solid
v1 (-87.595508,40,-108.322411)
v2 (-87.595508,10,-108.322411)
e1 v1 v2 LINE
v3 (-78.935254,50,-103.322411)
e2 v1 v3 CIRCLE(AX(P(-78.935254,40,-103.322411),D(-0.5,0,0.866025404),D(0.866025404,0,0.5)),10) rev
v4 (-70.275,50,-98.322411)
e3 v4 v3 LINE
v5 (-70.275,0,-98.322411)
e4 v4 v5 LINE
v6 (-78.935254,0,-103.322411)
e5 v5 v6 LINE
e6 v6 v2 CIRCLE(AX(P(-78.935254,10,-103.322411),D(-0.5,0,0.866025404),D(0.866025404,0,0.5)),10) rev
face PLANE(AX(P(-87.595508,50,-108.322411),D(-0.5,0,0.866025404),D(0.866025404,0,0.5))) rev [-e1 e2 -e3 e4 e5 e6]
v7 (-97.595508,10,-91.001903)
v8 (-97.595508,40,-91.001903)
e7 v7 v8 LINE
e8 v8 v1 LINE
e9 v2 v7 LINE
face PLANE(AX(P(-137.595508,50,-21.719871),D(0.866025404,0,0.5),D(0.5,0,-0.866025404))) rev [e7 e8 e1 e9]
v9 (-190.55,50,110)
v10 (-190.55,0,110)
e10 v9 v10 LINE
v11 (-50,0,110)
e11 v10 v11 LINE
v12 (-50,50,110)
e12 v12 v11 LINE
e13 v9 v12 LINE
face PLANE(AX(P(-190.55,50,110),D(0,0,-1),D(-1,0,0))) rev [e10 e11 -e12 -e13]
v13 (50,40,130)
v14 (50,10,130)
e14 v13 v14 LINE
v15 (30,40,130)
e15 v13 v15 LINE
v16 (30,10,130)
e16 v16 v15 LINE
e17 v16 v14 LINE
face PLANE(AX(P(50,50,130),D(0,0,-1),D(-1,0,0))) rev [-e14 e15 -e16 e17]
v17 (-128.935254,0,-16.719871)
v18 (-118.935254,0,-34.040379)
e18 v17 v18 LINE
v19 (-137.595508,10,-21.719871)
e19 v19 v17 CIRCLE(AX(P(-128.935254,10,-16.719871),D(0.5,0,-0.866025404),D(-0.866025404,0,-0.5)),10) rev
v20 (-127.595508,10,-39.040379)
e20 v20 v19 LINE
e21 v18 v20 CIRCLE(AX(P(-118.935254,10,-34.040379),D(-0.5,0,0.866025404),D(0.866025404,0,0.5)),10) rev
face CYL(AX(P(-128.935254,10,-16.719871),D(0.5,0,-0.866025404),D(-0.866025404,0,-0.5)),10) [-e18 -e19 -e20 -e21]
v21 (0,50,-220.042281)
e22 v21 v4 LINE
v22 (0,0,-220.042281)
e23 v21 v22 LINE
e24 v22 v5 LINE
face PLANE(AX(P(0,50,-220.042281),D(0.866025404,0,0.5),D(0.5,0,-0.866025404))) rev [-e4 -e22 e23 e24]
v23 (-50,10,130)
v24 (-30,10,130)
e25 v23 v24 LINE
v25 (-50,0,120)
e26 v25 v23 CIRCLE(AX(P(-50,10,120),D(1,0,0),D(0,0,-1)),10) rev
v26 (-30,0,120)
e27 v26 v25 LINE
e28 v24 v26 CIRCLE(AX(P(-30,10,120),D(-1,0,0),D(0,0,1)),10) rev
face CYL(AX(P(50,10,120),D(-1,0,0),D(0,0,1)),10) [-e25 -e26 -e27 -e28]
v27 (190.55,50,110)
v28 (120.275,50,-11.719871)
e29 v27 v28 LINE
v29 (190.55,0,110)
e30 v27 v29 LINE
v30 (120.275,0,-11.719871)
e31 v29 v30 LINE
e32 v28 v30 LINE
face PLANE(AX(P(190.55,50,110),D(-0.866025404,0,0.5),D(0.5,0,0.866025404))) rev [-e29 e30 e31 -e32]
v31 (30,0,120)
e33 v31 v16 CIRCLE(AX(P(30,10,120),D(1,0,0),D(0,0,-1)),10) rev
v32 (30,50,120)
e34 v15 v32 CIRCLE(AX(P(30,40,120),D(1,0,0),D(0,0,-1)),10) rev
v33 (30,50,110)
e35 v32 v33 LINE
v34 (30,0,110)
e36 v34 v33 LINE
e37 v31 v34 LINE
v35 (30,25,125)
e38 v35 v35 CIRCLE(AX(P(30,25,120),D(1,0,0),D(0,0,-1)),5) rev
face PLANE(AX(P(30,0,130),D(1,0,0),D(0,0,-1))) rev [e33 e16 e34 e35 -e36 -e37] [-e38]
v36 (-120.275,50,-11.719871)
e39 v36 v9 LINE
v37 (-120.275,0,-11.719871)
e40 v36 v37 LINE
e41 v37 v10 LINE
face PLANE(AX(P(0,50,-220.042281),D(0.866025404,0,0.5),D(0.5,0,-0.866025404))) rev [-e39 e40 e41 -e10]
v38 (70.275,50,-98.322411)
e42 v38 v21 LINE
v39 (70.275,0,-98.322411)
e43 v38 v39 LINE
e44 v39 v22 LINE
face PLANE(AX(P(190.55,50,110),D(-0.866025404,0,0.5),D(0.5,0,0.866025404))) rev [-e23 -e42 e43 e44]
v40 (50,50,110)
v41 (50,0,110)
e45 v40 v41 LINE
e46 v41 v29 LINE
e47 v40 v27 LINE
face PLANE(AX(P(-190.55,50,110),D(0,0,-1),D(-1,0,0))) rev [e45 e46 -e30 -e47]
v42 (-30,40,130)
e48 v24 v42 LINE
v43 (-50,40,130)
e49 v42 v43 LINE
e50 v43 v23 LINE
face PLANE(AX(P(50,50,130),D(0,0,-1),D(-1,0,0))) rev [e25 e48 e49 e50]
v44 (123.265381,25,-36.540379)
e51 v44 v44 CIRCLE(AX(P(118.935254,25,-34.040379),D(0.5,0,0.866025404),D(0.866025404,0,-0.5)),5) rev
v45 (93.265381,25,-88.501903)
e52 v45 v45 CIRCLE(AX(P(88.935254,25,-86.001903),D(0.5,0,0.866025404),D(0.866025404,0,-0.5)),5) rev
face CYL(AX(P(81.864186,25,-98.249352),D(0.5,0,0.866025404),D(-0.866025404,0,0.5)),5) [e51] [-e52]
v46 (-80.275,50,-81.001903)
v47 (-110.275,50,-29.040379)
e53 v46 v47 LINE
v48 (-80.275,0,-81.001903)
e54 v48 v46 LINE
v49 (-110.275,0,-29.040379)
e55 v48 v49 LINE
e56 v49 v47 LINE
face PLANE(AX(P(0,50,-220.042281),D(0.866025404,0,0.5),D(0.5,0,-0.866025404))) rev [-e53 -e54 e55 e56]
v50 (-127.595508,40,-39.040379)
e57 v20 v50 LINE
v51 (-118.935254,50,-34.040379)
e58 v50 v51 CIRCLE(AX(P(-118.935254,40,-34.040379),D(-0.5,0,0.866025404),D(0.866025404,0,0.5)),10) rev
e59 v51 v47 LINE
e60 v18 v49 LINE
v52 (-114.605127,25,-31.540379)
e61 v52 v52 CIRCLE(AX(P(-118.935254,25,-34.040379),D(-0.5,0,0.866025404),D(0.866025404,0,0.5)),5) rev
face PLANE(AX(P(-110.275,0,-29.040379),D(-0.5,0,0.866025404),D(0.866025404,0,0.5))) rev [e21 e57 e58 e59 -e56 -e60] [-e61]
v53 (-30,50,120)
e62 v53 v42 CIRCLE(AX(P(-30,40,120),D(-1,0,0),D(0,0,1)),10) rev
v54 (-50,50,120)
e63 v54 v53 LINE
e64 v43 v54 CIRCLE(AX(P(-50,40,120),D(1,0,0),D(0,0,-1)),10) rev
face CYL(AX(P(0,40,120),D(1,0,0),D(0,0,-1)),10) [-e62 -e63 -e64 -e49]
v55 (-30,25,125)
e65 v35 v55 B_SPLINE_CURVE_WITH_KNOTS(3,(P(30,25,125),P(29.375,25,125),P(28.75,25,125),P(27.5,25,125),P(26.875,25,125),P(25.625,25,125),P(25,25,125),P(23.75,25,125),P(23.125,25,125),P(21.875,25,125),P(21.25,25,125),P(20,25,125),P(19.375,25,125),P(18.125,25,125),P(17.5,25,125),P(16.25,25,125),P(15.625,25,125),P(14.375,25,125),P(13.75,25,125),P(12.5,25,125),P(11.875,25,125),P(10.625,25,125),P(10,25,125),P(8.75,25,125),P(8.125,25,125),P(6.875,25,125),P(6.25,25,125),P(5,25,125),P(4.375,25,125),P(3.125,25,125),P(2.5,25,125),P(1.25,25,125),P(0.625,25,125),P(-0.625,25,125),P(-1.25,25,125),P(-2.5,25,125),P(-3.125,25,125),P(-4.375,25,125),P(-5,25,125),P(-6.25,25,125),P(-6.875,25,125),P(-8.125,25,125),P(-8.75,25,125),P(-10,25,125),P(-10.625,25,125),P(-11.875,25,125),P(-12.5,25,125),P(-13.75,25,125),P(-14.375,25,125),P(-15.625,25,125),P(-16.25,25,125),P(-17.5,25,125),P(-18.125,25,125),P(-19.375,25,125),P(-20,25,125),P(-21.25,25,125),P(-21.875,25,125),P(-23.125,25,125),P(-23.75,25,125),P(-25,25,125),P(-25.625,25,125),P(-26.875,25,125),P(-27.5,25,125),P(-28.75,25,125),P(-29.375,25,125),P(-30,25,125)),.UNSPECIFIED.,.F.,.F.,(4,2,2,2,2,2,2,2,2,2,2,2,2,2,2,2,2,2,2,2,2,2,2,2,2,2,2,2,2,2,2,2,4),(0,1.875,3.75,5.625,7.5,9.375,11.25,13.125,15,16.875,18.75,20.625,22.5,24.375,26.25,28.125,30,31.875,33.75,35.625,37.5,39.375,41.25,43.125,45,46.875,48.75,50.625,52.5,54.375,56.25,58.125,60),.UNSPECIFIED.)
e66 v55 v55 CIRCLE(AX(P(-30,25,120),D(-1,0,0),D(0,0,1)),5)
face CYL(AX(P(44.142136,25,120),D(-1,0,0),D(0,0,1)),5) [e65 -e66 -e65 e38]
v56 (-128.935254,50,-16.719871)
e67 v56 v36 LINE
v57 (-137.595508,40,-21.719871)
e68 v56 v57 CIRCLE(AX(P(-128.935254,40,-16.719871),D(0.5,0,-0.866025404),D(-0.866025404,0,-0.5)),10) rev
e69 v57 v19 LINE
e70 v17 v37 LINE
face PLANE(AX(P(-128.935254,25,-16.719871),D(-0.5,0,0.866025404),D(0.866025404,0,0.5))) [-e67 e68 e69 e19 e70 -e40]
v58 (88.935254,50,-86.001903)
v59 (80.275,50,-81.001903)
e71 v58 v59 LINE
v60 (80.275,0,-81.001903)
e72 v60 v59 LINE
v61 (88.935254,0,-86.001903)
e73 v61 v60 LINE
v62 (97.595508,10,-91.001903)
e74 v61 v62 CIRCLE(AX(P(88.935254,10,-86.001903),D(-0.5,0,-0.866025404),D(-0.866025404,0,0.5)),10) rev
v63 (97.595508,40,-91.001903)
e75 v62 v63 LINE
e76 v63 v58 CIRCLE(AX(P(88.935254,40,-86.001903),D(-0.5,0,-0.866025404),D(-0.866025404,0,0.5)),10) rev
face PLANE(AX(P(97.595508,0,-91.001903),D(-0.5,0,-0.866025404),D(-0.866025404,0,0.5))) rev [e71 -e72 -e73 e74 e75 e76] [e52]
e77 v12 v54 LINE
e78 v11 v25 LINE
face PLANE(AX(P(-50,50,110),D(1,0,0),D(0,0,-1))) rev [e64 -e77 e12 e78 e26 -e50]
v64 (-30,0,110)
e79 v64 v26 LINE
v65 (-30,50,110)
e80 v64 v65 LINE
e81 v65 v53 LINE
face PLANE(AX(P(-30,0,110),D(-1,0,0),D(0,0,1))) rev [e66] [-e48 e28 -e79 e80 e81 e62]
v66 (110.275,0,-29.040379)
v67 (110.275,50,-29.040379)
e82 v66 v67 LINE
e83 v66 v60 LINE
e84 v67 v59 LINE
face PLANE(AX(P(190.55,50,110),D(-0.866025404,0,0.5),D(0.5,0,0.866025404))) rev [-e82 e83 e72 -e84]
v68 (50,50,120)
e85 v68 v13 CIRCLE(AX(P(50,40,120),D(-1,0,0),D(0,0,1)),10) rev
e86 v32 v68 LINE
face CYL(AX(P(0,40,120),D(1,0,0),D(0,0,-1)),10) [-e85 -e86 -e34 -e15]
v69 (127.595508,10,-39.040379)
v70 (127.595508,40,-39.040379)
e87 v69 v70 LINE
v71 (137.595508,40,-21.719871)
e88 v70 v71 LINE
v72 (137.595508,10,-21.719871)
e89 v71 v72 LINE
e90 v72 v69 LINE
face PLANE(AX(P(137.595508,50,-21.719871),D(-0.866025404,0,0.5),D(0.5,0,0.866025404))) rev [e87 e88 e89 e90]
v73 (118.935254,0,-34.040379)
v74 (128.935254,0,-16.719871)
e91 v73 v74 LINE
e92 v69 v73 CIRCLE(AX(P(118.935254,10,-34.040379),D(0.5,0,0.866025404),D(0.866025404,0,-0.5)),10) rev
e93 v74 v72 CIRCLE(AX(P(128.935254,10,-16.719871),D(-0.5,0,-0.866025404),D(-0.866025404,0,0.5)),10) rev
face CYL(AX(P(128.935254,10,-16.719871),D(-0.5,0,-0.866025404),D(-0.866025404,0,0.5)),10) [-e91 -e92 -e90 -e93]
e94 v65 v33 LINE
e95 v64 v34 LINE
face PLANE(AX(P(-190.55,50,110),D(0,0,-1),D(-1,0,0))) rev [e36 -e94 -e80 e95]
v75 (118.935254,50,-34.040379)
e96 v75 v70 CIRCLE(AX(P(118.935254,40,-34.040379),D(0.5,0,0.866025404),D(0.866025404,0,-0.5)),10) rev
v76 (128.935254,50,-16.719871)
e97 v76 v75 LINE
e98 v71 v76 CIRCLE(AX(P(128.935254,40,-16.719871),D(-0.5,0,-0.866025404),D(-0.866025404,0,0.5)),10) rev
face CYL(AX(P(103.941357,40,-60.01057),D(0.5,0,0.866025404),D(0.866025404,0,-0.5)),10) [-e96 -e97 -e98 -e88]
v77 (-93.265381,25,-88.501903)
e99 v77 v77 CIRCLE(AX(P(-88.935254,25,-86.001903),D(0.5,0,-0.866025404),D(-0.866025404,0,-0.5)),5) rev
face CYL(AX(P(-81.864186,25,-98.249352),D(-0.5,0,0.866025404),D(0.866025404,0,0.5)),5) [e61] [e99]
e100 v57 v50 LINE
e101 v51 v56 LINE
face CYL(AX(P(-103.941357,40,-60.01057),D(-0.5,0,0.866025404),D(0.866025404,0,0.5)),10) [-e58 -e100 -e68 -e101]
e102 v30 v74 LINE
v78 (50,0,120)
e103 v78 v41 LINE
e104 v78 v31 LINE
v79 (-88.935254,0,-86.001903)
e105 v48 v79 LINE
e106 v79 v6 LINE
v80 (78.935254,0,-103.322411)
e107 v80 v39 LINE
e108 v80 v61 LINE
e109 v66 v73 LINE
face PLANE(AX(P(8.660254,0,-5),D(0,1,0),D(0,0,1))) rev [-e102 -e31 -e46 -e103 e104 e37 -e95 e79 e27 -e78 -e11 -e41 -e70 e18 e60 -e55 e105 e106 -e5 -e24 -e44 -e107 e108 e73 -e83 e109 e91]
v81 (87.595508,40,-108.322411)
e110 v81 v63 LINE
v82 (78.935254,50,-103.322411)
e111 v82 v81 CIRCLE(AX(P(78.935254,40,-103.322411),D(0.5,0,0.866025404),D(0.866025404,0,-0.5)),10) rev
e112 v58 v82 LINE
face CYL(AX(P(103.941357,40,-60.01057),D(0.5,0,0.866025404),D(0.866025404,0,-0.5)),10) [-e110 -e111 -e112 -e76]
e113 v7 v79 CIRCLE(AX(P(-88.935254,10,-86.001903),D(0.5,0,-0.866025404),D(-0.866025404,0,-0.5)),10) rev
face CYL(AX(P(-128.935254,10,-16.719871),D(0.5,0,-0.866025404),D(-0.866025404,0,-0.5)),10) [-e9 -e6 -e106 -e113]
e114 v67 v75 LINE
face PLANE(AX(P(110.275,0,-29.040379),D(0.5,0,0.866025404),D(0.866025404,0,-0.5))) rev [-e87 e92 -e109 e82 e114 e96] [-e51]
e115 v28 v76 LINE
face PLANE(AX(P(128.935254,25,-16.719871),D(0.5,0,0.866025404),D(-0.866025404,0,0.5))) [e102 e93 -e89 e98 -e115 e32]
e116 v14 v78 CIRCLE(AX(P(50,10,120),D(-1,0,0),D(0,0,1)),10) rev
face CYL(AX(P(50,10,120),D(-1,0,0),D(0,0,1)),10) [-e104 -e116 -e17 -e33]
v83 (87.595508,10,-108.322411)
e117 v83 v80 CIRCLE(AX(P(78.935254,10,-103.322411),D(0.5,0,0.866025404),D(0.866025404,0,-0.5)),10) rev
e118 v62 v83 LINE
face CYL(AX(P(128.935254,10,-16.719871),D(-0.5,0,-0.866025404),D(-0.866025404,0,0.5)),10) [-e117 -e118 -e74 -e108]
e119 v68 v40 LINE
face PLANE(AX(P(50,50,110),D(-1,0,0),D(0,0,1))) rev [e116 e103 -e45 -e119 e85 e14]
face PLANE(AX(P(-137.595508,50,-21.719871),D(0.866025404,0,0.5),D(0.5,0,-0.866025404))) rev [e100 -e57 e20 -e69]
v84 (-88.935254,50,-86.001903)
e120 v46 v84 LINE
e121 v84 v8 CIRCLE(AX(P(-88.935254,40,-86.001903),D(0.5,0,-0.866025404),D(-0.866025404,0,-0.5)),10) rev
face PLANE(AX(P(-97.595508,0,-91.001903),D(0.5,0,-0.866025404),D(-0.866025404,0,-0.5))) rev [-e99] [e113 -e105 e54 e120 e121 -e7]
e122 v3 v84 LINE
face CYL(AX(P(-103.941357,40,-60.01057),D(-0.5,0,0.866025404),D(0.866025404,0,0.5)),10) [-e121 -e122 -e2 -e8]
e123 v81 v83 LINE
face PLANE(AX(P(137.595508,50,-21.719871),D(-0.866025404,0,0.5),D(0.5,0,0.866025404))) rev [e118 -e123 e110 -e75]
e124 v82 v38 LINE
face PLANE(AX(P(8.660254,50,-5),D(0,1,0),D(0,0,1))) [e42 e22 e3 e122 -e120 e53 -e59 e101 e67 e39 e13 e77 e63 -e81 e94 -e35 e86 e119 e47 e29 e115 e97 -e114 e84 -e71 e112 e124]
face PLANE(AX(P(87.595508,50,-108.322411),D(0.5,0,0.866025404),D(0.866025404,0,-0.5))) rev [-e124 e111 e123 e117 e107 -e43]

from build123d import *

# Parameters (mm, degrees)
BOSS_EXTRUDE1_DEPTH   = 50
BOSS_EXTRUDE2_DEPTH   = 50
BOSS_EXTRUDE2_2_DEPTH = 50
SKETCH3_W             = 100
SKETCH3_H             = 20
BOSS_EXTRUDE2_3_DEPTH = 50
SKETCH4_W             = 60
SKETCH4_H             = 20
CUT_EXTRUDE1_DEPTH    = 50
FILLET1_R             = 10
FILLET2_R             = 10
FILLET3_R             = 10
FILLET4_R             = 10
FILLET5_R             = 10
FILLET6_R             = 10
FILLET7_R             = 10
SKETCH5_R             = 5
BOSS_EXTRUDE3_DEPTH   = 80
SKETCH6_R             = 5
BOSS_EXTRUDE4_DEPTH   = 80


with BuildPart() as part:
    # Sketch1 → Boss-Extrude1 (new body)
    with BuildSketch(Plane(origin=(0, 0, 0), x_dir=(1, 0, 0), z_dir=(0, 1, 0))):
        Polygon((-190.55, -110), (190.55, -110), (0, 220.042281382), align=None)
    extrude(amount=BOSS_EXTRUDE1_DEPTH)


with BuildPart() as body_2:
    # Sketch3 → Boss-Extrude2 (new body)
    with BuildSketch(Plane(origin=(0, 0, 0), x_dir=(1, 0, 0), z_dir=(0, 1, 0))):
        Polygon((-128.935254038, 16.719870502), (-111.614745962, 6.719870502), (-61.614745962, 93.32241088), (-78.935254038, 103.32241088), align=None)
    extrude(amount=BOSS_EXTRUDE2_DEPTH)


with BuildPart() as body_3:
    # Sketch3 → Boss-Extrude2 2 (new body)
    with BuildSketch(Plane(origin=(0, 0, 0), x_dir=(1, 0, 0), z_dir=(0, 1, 0))):
        Polygon((111.614745962, 6.719870502), (61.614745962, 93.32241088), (78.935254038, 103.32241088), (128.935254038, 16.719870502), align=None)
    extrude(amount=BOSS_EXTRUDE2_2_DEPTH)


with BuildPart() as body_4:
    # Sketch3 → Boss-Extrude2 3 (new body)
    with BuildSketch(Plane(origin=(0, 0, 0), x_dir=(1, 0, 0), z_dir=(0, 1, 0))):
        with Locations((0, -110)):
            Rectangle(SKETCH3_W, SKETCH3_H)
    extrude(amount=BOSS_EXTRUDE2_3_DEPTH)


with BuildPart() as body_2_1:
    # Body-Move/Copy1: read off the stored shape, not the designer's step
    # Body-Move/Copy1: moved
    add(body_2.part.moved(Location((-8.660254, 0, -5))))


with BuildPart() as body_3_1:
    # Body-Move/Copy2: read off the stored shape, not the designer's step
    # Body-Move/Copy2: moved
    add(body_3.part.moved(Location((8.660254, 0, -5))))


with BuildPart() as body_4_1:
    # Body-Move/Copy3: read off the stored shape, not the designer's step
    # Body-Move/Copy3: moved
    add(body_4.part.moved(Location((0, 0, 10))))


with BuildPart() as cut_extrude1_tool:
    # Sketch4 → Cut-Extrude1 (new body)
    with BuildSketch(Plane(origin=(0, 50, 0), x_dir=(1, 0, 0), z_dir=(0, 1, 0))):
        Polygon((-97.595508076, 91.001902805), (-80.275, 81.001902805), (-110.275, 29.040378578), (-127.595508076, 39.040378578), align=None)
        Polygon((127.595508076, 39.040378578), (97.595508076, 91.001902805), (80.275, 81.001902805), (110.275, 29.040378578), align=None)
        with Locations((0, -120)):
            Rectangle(SKETCH4_W, SKETCH4_H)
    extrude(amount=-CUT_EXTRUDE1_DEPTH)


with BuildPart() as body_2_2:
    add(body_2_1.part)

    # Cut-Extrude1: cut by cut_extrude1_tool
    add(cut_extrude1_tool.part, mode=Mode.SUBTRACT)


with BuildPart() as body_3_2:
    add(body_3_1.part)

    # Cut-Extrude1: cut by cut_extrude1_tool
    add(cut_extrude1_tool.part, mode=Mode.SUBTRACT)


with BuildPart() as body_4_2:
    add(body_4_1.part)

    # Cut-Extrude1: cut by cut_extrude1_tool
    add(cut_extrude1_tool.part, mode=Mode.SUBTRACT)


with BuildPart() as cut_extrude1_piece_1:
    # of the separate pieces the step leaves, piece 1, a body of its own (cut_extrude1_pieces)
    add(body_2_2.part.solids().sort_by_distance((-87.595508038, 0, -108.32241088))[0])

    # Fillet1
    fillet1_edges = [cut_extrude1_piece_1.edges().sort_by_distance(p)[0] for p in [
        (-92.595508043, 0, -99.662156834),
        (-92.595508043, 50, -99.662156834),
    ]]
    fillet(fillet1_edges, radius=FILLET1_R)


with BuildPart() as cut_extrude1_piece_2:
    # of the separate pieces the step leaves, piece 2, a body of its own (cut_extrude1_pieces)
    add(body_2_2.part.solids().sort_by_distance((-137.595508038, 0, -21.719870502))[0])

    # Fillet2
    fillet2_edges = [cut_extrude1_piece_2.edges().sort_by_distance(p)[0] for p in [
        (-132.595508043, 0, -30.380124532),
        (-132.595508043, 50, -30.380124532),
    ]]
    fillet(fillet2_edges, radius=FILLET2_R)


with BuildPart() as cut_extrude1_piece_1_of_body_3:
    # of the separate pieces the step leaves, piece 1, a body of its own (cut_extrude1_pieces_of_body_3)
    add(body_3_2.part.solids().sort_by_distance((80.275, 0, -81.001902805))[0])

    # Fillet7
    fillet7_edges = [cut_extrude1_piece_1_of_body_3.edges().sort_by_distance(p)[0] for p in [
        (92.595508043, 0, -99.662156834),
        (92.595508043, 50, -99.662156834),
    ]]
    fillet(fillet7_edges, radius=FILLET7_R)


with BuildPart() as cut_extrude1_piece_2_of_body_3:
    # of the separate pieces the step leaves, piece 2, a body of its own (cut_extrude1_pieces_of_body_3)
    add(body_3_2.part.solids().sort_by_distance((120.274999962, 0, -11.719870502))[0])

    # Fillet6
    fillet6_edges = [cut_extrude1_piece_2_of_body_3.edges().sort_by_distance(p)[0] for p in [
        (132.595508043, 0, -30.380124532),
        (132.595508043, 50, -30.380124532),
    ]]
    fillet(fillet6_edges, radius=FILLET6_R)


with BuildPart() as cut_extrude1_piece_1_of_body_4:
    # of the separate pieces the step leaves, piece 1, a body of its own (cut_extrude1_pieces_of_body_4)
    add(body_4_2.part.solids().sort_by_distance((50, 0, 110))[0])

    # Fillet5
    fillet5_edges = [cut_extrude1_piece_1_of_body_4.edges().sort_by_distance(p)[0] for p in [
        (40, 0, 130),
        (40, 50, 130),
    ]]
    fillet(fillet5_edges, radius=FILLET5_R)


with BuildPart() as cut_extrude1_piece_2_of_body_4:
    # of the separate pieces the step leaves, piece 2, a body of its own (cut_extrude1_pieces_of_body_4)
    add(body_4_2.part.solids().sort_by_distance((-30, 0, 110))[0])

    # Fillet3
    fillet3_edges = [cut_extrude1_piece_2_of_body_4.edges().sort_by_distance(p)[0] for p in [
        (-40, 50, 130),
    ]]
    fillet(fillet3_edges, radius=FILLET3_R)

    # Fillet4
    fillet4_edges = [cut_extrude1_piece_2_of_body_4.edges().sort_by_distance(p)[0] for p in [
        (-40, 0, 130),
    ]]
    fillet(fillet4_edges, radius=FILLET4_R)


with BuildPart() as cut_extrude1_piece_2_of_body_3_1:
    add(cut_extrude1_piece_2_of_body_3.part)

    # Combine1: union Cut-Extrude1 piece 2, Cut-Extrude1 piece 2 of body 4, part, Cut-Extrude1 piece 1 of body 4, Cut-Extrude1 piece 1, Cut-Extrude1 piece 1 of body 3
    add(cut_extrude1_piece_2.part)
    add(cut_extrude1_piece_2_of_body_4.part)
    add(part.part)
    add(cut_extrude1_piece_1_of_body_4.part)
    add(cut_extrude1_piece_1.part)
    add(cut_extrude1_piece_1_of_body_3.part)


with BuildPart() as body_2_2_1:
    # Sketch5 → Boss-Extrude3 (new body)
    with BuildSketch(Plane(origin=(-24.993897208, 0, 43.290699844), x_dir=(0.8660254037844362, 0, 0.5000000000000046), z_dir=(-0.5000000000000044, 0, 0.866025403784436))):
        with Locations((-120.021140691, 25)):
            Circle(SKETCH5_R)
    extrude(amount=-BOSS_EXTRUDE3_DEPTH)


with BuildPart() as body_3_2_1:
    # Mirror3: mirrored copy
    add(body_2_2_1.part.mirror(Plane(origin=(0, 0, 0), x_dir=(0, 0, 1), z_dir=(1, 0, 0))))


with BuildPart() as body_2_2_2:
    add(body_2_2_1.part)

    # Combine2: union body 3 2, Cut-Extrude1 piece 2 of body 3
    add(body_3_2_1.part)
    add(cut_extrude1_piece_2_of_body_3_1.part)

    # Sketch6 → Boss-Extrude4 (add)
    with BuildSketch(Plane.ZY.offset(50)):
        with Locations((120, 25)):
            Circle(SKETCH6_R)
    extrude(amount=-BOSS_EXTRUDE4_DEPTH)


solid = body_2_2_2.part
